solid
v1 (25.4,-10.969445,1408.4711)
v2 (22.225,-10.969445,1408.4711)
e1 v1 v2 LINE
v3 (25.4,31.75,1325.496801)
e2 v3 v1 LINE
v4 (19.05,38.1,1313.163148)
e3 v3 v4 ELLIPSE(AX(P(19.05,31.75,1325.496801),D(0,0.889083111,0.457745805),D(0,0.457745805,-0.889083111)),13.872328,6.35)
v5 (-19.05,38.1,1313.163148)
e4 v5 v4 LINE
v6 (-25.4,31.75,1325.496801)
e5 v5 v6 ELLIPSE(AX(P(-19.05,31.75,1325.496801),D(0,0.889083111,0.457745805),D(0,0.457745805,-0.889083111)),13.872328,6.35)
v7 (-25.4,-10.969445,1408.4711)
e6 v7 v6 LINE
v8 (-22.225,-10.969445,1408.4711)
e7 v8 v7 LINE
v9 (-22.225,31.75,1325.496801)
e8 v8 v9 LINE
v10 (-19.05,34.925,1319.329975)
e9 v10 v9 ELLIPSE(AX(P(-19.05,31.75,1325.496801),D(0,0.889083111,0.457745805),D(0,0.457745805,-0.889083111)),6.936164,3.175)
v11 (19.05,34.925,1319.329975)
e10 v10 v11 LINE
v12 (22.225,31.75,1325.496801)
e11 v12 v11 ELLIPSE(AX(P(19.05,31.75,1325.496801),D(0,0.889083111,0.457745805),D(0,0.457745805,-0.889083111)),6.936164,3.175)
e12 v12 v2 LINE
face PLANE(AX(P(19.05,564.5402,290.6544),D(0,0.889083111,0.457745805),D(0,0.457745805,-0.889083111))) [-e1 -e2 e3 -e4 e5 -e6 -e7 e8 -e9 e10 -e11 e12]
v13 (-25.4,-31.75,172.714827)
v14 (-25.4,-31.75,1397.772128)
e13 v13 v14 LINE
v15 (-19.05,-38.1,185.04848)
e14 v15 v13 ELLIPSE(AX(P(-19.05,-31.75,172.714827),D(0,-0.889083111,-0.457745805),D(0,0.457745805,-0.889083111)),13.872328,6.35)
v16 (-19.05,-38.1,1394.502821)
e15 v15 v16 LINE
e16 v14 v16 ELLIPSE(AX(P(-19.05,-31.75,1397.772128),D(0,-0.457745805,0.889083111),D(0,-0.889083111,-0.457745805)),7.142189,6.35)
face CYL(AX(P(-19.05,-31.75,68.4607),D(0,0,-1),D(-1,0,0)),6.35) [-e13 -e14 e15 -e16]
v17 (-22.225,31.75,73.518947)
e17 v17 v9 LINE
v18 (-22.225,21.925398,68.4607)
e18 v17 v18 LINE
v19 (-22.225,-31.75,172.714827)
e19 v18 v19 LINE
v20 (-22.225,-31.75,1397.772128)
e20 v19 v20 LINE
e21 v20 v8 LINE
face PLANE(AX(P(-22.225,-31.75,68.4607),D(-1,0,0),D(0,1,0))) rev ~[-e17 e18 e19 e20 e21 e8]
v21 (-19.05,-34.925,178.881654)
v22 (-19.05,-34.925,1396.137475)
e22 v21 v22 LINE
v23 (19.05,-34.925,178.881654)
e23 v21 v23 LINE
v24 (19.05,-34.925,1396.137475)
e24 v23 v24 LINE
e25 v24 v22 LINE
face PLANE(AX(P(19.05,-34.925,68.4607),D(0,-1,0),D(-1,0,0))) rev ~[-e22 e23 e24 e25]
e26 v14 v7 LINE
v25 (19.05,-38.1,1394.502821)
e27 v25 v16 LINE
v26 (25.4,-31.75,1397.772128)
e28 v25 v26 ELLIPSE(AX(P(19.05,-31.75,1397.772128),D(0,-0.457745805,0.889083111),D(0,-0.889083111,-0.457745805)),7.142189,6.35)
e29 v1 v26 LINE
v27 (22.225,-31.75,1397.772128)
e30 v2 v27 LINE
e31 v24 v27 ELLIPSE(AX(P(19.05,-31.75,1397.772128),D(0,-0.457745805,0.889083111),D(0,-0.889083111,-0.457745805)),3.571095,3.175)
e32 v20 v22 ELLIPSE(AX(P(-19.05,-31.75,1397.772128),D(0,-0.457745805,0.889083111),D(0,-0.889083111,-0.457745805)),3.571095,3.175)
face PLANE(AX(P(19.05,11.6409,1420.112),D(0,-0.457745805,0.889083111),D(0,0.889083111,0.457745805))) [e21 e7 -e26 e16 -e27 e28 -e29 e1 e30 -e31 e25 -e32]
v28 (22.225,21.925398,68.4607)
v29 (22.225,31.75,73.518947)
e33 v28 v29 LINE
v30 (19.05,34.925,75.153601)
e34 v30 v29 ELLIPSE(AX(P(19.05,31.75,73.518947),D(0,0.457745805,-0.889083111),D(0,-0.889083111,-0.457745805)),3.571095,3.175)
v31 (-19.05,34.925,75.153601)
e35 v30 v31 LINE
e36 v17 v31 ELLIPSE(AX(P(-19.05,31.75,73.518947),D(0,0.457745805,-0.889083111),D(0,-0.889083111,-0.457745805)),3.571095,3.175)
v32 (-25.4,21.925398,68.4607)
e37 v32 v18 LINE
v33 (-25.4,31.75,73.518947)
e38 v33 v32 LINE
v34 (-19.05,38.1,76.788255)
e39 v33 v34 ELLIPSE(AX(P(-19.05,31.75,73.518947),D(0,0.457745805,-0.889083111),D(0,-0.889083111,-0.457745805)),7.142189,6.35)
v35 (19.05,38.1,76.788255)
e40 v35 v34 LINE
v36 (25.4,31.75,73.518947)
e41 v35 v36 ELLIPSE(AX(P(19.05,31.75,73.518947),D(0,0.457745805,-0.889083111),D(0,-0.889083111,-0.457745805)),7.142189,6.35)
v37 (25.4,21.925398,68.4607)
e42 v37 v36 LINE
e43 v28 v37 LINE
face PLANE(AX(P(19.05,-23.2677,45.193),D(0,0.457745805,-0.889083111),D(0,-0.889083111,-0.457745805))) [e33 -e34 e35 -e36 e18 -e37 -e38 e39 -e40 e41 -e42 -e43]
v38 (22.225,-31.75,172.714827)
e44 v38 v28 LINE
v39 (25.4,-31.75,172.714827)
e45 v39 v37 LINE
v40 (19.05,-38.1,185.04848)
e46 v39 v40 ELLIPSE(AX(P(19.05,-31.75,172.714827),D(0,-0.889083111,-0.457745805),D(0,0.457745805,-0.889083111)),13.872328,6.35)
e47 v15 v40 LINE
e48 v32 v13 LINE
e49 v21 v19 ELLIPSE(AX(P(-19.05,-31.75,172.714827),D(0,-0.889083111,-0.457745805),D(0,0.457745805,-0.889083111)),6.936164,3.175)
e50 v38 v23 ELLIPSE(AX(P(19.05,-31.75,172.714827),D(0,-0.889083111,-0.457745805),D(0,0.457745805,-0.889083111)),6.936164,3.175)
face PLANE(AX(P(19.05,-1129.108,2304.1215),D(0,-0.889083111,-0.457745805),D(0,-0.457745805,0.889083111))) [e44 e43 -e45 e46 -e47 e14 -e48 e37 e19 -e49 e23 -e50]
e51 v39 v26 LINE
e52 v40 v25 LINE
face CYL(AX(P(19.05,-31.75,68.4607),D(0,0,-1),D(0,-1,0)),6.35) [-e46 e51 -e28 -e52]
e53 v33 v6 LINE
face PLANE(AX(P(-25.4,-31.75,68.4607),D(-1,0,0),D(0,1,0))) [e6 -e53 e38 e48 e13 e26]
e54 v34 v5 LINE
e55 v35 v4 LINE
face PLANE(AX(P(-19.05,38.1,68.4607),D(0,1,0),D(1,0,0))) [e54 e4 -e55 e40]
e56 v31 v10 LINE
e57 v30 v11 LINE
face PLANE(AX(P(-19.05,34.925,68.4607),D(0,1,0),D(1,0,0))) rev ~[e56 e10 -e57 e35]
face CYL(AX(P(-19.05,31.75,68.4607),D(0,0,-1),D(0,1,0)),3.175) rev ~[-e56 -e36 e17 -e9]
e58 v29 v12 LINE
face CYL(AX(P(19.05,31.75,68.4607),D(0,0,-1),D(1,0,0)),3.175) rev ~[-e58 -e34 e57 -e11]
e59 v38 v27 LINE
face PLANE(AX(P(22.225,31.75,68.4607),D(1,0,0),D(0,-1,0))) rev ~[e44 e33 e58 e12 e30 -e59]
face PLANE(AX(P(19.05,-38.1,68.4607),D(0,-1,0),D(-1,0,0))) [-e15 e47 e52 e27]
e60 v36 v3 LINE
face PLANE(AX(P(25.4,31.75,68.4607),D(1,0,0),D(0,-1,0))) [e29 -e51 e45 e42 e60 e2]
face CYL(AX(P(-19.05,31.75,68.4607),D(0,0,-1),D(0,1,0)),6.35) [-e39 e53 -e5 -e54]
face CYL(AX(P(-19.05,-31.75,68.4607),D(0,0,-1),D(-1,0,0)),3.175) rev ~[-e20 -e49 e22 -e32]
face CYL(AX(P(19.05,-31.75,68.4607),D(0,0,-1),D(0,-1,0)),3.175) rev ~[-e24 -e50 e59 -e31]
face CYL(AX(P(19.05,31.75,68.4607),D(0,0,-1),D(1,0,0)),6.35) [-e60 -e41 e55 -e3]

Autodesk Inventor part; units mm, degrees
ref_plane "Start Plane" through (0, 0, 68.4607) normal (0, 0, 1) x (1, 0, 0)
ref_plane "End Plane" through (0, 0, 1408.471) normal (0, 0, 1) x (1, 0, 0)
sketch "Sketch" plane through (0, 0, 0) normal (0, 0, 1) x (1, 0, 0)
  line L0 (-25.4, -31.75) -> (-25.4, 31.75)
  line L1 (-19.05, 38.1) -> (19.05, 38.1)
  line L2 (25.4, 31.75) -> (25.4, -31.75)
  line L3 (19.05, -38.1) -> (-19.05, -38.1)
  arc A0 (-25.4, -31.75) -> (-19.05, -38.1) centre (-19.05, -31.75) ccw
  arc A1 (-19.05, 38.1) -> (-25.4, 31.75) centre (-19.05, 31.75) ccw
  arc A2 (25.4, 31.75) -> (19.05, 38.1) centre (19.05, 31.75) ccw
  arc A3 (19.05, -38.1) -> (25.4, -31.75) centre (19.05, -31.75) ccw
  arc A4 (-19.05, 34.925) -> (-22.225, 31.75) centre (-19.05, 31.75) ccw
  line L4 (-19.05, 34.925) -> (19.05, 34.925)
  arc A5 (22.225, 31.75) -> (19.05, 34.925) centre (19.05, 31.75) ccw
  line L5 (22.225, 31.75) -> (22.225, -31.75)
  arc A6 (19.05, -34.925) -> (22.225, -31.75) centre (19.05, -31.75) ccw
  line L6 (19.05, -34.925) -> (-19.05, -34.925)
  arc A7 (-22.225, -31.75) -> (-19.05, -34.925) centre (-19.05, -31.75) ccw
  line L7 (-22.225, -31.75) -> (-22.225, 31.75)
  line L8 (0, 55.1812) -> (0, -55.1812) construction
  line L9 (-37.4012, 0) -> (37.4012, 0) construction
  dimension "d10" = 76.2
  dimension "d11" = 50.8
  dimension "d12" = 3.175
  dimension "d15" = 38.1
  dimension "d16" = 25.4
  dimension "d17" = 6.35
extrude "Body" add sketch "Sketch" along normal up to surface (1340.0104 mm away) from surface at 68.4607
sketch "Sketch3" plane through (0, 0, 0) normal (0, 0, 1) x (1, 0, 0)
  line L0 (0, 0) -> (10, 0)
ref_plane "Work Plane3" through (0, 0, 0) normal (0, -1, 0) x (1, 0, 0)
ref_plane "Work Plane4" through (19.05, -1129.108, 2304.1215) normal (0, -0.8890831, -0.4577458) x (1, 0, 0)
split "Split1" plane through (19.05, -1129.108, 2304.1215) removes the side toward (0, -0.8890831, -0.4577458)
ref_plane "Work Plane5" through (19.05, -23.2677, 45.193) normal (0, 0.4577458, -0.8890831) x (1, 0, 0)
split "Split2" plane through (19.05, -23.2677, 45.193) removes the side toward (0, 0.4577458, -0.8890831)
ref_plane "Work Plane6" through (19.05, 564.5402, 290.6544) normal (0, 0.8890831, 0.4577458) x (1, 0, 0)
split "Split3" plane through (19.05, 564.5402, 290.6544) removes the side toward (0, 0.8890831, 0.4577458)
ref_plane "Work Plane7" through (19.05, 11.6409, 1420.112) normal (0, -0.4577458, 0.8890831) x (1, 0, 0)
split "Split4" plane through (19.05, 11.6409, 1420.112) removes the side toward (0, -0.4577458, 0.8890831)
sketch "Sketch4" plane through (0, 0, 0) normal (0, -1, 0) x (1, 0, 0)
  line L0 (-2, 68.4607) -> (12, 68.4607) projected
  line L1 (-2, 1408.471) -> (12, 1408.471) projected
  dimension "d19" = 1340.0104
equation "\"d10\" = G_H"
equation "\"d11\" = G_W"
equation "\"d12\" = G_T"
equation "\"d15\" = 0.5 * d10"
equation "\"d16\" = 0.5 * d11"
equation "\"d17\" = G_IR"
equation "\"d3\" = G_L"
equation "\"G_W\" = 50.8"
equation "\"G_H\" = 76.2"
equation "\"G_T\" = 3.175"
equation "\"G_IR\" = 6.35"
equation "\"G_L\" = d19"
equation "\"G_OFFSET_START\" = -68.46066"
equation "\"G_OFFSET_END\" = -34.25121"
equation "\"d13\" = -G_OFFSET_START"
equation "\"d14\" = G_OFFSET_END + B_L"
equation "\"B_L\" = 1442.72224"
properties part number "AISC - 3 x 2 x 1/8 - 52.756" material "Steel, Mild"
